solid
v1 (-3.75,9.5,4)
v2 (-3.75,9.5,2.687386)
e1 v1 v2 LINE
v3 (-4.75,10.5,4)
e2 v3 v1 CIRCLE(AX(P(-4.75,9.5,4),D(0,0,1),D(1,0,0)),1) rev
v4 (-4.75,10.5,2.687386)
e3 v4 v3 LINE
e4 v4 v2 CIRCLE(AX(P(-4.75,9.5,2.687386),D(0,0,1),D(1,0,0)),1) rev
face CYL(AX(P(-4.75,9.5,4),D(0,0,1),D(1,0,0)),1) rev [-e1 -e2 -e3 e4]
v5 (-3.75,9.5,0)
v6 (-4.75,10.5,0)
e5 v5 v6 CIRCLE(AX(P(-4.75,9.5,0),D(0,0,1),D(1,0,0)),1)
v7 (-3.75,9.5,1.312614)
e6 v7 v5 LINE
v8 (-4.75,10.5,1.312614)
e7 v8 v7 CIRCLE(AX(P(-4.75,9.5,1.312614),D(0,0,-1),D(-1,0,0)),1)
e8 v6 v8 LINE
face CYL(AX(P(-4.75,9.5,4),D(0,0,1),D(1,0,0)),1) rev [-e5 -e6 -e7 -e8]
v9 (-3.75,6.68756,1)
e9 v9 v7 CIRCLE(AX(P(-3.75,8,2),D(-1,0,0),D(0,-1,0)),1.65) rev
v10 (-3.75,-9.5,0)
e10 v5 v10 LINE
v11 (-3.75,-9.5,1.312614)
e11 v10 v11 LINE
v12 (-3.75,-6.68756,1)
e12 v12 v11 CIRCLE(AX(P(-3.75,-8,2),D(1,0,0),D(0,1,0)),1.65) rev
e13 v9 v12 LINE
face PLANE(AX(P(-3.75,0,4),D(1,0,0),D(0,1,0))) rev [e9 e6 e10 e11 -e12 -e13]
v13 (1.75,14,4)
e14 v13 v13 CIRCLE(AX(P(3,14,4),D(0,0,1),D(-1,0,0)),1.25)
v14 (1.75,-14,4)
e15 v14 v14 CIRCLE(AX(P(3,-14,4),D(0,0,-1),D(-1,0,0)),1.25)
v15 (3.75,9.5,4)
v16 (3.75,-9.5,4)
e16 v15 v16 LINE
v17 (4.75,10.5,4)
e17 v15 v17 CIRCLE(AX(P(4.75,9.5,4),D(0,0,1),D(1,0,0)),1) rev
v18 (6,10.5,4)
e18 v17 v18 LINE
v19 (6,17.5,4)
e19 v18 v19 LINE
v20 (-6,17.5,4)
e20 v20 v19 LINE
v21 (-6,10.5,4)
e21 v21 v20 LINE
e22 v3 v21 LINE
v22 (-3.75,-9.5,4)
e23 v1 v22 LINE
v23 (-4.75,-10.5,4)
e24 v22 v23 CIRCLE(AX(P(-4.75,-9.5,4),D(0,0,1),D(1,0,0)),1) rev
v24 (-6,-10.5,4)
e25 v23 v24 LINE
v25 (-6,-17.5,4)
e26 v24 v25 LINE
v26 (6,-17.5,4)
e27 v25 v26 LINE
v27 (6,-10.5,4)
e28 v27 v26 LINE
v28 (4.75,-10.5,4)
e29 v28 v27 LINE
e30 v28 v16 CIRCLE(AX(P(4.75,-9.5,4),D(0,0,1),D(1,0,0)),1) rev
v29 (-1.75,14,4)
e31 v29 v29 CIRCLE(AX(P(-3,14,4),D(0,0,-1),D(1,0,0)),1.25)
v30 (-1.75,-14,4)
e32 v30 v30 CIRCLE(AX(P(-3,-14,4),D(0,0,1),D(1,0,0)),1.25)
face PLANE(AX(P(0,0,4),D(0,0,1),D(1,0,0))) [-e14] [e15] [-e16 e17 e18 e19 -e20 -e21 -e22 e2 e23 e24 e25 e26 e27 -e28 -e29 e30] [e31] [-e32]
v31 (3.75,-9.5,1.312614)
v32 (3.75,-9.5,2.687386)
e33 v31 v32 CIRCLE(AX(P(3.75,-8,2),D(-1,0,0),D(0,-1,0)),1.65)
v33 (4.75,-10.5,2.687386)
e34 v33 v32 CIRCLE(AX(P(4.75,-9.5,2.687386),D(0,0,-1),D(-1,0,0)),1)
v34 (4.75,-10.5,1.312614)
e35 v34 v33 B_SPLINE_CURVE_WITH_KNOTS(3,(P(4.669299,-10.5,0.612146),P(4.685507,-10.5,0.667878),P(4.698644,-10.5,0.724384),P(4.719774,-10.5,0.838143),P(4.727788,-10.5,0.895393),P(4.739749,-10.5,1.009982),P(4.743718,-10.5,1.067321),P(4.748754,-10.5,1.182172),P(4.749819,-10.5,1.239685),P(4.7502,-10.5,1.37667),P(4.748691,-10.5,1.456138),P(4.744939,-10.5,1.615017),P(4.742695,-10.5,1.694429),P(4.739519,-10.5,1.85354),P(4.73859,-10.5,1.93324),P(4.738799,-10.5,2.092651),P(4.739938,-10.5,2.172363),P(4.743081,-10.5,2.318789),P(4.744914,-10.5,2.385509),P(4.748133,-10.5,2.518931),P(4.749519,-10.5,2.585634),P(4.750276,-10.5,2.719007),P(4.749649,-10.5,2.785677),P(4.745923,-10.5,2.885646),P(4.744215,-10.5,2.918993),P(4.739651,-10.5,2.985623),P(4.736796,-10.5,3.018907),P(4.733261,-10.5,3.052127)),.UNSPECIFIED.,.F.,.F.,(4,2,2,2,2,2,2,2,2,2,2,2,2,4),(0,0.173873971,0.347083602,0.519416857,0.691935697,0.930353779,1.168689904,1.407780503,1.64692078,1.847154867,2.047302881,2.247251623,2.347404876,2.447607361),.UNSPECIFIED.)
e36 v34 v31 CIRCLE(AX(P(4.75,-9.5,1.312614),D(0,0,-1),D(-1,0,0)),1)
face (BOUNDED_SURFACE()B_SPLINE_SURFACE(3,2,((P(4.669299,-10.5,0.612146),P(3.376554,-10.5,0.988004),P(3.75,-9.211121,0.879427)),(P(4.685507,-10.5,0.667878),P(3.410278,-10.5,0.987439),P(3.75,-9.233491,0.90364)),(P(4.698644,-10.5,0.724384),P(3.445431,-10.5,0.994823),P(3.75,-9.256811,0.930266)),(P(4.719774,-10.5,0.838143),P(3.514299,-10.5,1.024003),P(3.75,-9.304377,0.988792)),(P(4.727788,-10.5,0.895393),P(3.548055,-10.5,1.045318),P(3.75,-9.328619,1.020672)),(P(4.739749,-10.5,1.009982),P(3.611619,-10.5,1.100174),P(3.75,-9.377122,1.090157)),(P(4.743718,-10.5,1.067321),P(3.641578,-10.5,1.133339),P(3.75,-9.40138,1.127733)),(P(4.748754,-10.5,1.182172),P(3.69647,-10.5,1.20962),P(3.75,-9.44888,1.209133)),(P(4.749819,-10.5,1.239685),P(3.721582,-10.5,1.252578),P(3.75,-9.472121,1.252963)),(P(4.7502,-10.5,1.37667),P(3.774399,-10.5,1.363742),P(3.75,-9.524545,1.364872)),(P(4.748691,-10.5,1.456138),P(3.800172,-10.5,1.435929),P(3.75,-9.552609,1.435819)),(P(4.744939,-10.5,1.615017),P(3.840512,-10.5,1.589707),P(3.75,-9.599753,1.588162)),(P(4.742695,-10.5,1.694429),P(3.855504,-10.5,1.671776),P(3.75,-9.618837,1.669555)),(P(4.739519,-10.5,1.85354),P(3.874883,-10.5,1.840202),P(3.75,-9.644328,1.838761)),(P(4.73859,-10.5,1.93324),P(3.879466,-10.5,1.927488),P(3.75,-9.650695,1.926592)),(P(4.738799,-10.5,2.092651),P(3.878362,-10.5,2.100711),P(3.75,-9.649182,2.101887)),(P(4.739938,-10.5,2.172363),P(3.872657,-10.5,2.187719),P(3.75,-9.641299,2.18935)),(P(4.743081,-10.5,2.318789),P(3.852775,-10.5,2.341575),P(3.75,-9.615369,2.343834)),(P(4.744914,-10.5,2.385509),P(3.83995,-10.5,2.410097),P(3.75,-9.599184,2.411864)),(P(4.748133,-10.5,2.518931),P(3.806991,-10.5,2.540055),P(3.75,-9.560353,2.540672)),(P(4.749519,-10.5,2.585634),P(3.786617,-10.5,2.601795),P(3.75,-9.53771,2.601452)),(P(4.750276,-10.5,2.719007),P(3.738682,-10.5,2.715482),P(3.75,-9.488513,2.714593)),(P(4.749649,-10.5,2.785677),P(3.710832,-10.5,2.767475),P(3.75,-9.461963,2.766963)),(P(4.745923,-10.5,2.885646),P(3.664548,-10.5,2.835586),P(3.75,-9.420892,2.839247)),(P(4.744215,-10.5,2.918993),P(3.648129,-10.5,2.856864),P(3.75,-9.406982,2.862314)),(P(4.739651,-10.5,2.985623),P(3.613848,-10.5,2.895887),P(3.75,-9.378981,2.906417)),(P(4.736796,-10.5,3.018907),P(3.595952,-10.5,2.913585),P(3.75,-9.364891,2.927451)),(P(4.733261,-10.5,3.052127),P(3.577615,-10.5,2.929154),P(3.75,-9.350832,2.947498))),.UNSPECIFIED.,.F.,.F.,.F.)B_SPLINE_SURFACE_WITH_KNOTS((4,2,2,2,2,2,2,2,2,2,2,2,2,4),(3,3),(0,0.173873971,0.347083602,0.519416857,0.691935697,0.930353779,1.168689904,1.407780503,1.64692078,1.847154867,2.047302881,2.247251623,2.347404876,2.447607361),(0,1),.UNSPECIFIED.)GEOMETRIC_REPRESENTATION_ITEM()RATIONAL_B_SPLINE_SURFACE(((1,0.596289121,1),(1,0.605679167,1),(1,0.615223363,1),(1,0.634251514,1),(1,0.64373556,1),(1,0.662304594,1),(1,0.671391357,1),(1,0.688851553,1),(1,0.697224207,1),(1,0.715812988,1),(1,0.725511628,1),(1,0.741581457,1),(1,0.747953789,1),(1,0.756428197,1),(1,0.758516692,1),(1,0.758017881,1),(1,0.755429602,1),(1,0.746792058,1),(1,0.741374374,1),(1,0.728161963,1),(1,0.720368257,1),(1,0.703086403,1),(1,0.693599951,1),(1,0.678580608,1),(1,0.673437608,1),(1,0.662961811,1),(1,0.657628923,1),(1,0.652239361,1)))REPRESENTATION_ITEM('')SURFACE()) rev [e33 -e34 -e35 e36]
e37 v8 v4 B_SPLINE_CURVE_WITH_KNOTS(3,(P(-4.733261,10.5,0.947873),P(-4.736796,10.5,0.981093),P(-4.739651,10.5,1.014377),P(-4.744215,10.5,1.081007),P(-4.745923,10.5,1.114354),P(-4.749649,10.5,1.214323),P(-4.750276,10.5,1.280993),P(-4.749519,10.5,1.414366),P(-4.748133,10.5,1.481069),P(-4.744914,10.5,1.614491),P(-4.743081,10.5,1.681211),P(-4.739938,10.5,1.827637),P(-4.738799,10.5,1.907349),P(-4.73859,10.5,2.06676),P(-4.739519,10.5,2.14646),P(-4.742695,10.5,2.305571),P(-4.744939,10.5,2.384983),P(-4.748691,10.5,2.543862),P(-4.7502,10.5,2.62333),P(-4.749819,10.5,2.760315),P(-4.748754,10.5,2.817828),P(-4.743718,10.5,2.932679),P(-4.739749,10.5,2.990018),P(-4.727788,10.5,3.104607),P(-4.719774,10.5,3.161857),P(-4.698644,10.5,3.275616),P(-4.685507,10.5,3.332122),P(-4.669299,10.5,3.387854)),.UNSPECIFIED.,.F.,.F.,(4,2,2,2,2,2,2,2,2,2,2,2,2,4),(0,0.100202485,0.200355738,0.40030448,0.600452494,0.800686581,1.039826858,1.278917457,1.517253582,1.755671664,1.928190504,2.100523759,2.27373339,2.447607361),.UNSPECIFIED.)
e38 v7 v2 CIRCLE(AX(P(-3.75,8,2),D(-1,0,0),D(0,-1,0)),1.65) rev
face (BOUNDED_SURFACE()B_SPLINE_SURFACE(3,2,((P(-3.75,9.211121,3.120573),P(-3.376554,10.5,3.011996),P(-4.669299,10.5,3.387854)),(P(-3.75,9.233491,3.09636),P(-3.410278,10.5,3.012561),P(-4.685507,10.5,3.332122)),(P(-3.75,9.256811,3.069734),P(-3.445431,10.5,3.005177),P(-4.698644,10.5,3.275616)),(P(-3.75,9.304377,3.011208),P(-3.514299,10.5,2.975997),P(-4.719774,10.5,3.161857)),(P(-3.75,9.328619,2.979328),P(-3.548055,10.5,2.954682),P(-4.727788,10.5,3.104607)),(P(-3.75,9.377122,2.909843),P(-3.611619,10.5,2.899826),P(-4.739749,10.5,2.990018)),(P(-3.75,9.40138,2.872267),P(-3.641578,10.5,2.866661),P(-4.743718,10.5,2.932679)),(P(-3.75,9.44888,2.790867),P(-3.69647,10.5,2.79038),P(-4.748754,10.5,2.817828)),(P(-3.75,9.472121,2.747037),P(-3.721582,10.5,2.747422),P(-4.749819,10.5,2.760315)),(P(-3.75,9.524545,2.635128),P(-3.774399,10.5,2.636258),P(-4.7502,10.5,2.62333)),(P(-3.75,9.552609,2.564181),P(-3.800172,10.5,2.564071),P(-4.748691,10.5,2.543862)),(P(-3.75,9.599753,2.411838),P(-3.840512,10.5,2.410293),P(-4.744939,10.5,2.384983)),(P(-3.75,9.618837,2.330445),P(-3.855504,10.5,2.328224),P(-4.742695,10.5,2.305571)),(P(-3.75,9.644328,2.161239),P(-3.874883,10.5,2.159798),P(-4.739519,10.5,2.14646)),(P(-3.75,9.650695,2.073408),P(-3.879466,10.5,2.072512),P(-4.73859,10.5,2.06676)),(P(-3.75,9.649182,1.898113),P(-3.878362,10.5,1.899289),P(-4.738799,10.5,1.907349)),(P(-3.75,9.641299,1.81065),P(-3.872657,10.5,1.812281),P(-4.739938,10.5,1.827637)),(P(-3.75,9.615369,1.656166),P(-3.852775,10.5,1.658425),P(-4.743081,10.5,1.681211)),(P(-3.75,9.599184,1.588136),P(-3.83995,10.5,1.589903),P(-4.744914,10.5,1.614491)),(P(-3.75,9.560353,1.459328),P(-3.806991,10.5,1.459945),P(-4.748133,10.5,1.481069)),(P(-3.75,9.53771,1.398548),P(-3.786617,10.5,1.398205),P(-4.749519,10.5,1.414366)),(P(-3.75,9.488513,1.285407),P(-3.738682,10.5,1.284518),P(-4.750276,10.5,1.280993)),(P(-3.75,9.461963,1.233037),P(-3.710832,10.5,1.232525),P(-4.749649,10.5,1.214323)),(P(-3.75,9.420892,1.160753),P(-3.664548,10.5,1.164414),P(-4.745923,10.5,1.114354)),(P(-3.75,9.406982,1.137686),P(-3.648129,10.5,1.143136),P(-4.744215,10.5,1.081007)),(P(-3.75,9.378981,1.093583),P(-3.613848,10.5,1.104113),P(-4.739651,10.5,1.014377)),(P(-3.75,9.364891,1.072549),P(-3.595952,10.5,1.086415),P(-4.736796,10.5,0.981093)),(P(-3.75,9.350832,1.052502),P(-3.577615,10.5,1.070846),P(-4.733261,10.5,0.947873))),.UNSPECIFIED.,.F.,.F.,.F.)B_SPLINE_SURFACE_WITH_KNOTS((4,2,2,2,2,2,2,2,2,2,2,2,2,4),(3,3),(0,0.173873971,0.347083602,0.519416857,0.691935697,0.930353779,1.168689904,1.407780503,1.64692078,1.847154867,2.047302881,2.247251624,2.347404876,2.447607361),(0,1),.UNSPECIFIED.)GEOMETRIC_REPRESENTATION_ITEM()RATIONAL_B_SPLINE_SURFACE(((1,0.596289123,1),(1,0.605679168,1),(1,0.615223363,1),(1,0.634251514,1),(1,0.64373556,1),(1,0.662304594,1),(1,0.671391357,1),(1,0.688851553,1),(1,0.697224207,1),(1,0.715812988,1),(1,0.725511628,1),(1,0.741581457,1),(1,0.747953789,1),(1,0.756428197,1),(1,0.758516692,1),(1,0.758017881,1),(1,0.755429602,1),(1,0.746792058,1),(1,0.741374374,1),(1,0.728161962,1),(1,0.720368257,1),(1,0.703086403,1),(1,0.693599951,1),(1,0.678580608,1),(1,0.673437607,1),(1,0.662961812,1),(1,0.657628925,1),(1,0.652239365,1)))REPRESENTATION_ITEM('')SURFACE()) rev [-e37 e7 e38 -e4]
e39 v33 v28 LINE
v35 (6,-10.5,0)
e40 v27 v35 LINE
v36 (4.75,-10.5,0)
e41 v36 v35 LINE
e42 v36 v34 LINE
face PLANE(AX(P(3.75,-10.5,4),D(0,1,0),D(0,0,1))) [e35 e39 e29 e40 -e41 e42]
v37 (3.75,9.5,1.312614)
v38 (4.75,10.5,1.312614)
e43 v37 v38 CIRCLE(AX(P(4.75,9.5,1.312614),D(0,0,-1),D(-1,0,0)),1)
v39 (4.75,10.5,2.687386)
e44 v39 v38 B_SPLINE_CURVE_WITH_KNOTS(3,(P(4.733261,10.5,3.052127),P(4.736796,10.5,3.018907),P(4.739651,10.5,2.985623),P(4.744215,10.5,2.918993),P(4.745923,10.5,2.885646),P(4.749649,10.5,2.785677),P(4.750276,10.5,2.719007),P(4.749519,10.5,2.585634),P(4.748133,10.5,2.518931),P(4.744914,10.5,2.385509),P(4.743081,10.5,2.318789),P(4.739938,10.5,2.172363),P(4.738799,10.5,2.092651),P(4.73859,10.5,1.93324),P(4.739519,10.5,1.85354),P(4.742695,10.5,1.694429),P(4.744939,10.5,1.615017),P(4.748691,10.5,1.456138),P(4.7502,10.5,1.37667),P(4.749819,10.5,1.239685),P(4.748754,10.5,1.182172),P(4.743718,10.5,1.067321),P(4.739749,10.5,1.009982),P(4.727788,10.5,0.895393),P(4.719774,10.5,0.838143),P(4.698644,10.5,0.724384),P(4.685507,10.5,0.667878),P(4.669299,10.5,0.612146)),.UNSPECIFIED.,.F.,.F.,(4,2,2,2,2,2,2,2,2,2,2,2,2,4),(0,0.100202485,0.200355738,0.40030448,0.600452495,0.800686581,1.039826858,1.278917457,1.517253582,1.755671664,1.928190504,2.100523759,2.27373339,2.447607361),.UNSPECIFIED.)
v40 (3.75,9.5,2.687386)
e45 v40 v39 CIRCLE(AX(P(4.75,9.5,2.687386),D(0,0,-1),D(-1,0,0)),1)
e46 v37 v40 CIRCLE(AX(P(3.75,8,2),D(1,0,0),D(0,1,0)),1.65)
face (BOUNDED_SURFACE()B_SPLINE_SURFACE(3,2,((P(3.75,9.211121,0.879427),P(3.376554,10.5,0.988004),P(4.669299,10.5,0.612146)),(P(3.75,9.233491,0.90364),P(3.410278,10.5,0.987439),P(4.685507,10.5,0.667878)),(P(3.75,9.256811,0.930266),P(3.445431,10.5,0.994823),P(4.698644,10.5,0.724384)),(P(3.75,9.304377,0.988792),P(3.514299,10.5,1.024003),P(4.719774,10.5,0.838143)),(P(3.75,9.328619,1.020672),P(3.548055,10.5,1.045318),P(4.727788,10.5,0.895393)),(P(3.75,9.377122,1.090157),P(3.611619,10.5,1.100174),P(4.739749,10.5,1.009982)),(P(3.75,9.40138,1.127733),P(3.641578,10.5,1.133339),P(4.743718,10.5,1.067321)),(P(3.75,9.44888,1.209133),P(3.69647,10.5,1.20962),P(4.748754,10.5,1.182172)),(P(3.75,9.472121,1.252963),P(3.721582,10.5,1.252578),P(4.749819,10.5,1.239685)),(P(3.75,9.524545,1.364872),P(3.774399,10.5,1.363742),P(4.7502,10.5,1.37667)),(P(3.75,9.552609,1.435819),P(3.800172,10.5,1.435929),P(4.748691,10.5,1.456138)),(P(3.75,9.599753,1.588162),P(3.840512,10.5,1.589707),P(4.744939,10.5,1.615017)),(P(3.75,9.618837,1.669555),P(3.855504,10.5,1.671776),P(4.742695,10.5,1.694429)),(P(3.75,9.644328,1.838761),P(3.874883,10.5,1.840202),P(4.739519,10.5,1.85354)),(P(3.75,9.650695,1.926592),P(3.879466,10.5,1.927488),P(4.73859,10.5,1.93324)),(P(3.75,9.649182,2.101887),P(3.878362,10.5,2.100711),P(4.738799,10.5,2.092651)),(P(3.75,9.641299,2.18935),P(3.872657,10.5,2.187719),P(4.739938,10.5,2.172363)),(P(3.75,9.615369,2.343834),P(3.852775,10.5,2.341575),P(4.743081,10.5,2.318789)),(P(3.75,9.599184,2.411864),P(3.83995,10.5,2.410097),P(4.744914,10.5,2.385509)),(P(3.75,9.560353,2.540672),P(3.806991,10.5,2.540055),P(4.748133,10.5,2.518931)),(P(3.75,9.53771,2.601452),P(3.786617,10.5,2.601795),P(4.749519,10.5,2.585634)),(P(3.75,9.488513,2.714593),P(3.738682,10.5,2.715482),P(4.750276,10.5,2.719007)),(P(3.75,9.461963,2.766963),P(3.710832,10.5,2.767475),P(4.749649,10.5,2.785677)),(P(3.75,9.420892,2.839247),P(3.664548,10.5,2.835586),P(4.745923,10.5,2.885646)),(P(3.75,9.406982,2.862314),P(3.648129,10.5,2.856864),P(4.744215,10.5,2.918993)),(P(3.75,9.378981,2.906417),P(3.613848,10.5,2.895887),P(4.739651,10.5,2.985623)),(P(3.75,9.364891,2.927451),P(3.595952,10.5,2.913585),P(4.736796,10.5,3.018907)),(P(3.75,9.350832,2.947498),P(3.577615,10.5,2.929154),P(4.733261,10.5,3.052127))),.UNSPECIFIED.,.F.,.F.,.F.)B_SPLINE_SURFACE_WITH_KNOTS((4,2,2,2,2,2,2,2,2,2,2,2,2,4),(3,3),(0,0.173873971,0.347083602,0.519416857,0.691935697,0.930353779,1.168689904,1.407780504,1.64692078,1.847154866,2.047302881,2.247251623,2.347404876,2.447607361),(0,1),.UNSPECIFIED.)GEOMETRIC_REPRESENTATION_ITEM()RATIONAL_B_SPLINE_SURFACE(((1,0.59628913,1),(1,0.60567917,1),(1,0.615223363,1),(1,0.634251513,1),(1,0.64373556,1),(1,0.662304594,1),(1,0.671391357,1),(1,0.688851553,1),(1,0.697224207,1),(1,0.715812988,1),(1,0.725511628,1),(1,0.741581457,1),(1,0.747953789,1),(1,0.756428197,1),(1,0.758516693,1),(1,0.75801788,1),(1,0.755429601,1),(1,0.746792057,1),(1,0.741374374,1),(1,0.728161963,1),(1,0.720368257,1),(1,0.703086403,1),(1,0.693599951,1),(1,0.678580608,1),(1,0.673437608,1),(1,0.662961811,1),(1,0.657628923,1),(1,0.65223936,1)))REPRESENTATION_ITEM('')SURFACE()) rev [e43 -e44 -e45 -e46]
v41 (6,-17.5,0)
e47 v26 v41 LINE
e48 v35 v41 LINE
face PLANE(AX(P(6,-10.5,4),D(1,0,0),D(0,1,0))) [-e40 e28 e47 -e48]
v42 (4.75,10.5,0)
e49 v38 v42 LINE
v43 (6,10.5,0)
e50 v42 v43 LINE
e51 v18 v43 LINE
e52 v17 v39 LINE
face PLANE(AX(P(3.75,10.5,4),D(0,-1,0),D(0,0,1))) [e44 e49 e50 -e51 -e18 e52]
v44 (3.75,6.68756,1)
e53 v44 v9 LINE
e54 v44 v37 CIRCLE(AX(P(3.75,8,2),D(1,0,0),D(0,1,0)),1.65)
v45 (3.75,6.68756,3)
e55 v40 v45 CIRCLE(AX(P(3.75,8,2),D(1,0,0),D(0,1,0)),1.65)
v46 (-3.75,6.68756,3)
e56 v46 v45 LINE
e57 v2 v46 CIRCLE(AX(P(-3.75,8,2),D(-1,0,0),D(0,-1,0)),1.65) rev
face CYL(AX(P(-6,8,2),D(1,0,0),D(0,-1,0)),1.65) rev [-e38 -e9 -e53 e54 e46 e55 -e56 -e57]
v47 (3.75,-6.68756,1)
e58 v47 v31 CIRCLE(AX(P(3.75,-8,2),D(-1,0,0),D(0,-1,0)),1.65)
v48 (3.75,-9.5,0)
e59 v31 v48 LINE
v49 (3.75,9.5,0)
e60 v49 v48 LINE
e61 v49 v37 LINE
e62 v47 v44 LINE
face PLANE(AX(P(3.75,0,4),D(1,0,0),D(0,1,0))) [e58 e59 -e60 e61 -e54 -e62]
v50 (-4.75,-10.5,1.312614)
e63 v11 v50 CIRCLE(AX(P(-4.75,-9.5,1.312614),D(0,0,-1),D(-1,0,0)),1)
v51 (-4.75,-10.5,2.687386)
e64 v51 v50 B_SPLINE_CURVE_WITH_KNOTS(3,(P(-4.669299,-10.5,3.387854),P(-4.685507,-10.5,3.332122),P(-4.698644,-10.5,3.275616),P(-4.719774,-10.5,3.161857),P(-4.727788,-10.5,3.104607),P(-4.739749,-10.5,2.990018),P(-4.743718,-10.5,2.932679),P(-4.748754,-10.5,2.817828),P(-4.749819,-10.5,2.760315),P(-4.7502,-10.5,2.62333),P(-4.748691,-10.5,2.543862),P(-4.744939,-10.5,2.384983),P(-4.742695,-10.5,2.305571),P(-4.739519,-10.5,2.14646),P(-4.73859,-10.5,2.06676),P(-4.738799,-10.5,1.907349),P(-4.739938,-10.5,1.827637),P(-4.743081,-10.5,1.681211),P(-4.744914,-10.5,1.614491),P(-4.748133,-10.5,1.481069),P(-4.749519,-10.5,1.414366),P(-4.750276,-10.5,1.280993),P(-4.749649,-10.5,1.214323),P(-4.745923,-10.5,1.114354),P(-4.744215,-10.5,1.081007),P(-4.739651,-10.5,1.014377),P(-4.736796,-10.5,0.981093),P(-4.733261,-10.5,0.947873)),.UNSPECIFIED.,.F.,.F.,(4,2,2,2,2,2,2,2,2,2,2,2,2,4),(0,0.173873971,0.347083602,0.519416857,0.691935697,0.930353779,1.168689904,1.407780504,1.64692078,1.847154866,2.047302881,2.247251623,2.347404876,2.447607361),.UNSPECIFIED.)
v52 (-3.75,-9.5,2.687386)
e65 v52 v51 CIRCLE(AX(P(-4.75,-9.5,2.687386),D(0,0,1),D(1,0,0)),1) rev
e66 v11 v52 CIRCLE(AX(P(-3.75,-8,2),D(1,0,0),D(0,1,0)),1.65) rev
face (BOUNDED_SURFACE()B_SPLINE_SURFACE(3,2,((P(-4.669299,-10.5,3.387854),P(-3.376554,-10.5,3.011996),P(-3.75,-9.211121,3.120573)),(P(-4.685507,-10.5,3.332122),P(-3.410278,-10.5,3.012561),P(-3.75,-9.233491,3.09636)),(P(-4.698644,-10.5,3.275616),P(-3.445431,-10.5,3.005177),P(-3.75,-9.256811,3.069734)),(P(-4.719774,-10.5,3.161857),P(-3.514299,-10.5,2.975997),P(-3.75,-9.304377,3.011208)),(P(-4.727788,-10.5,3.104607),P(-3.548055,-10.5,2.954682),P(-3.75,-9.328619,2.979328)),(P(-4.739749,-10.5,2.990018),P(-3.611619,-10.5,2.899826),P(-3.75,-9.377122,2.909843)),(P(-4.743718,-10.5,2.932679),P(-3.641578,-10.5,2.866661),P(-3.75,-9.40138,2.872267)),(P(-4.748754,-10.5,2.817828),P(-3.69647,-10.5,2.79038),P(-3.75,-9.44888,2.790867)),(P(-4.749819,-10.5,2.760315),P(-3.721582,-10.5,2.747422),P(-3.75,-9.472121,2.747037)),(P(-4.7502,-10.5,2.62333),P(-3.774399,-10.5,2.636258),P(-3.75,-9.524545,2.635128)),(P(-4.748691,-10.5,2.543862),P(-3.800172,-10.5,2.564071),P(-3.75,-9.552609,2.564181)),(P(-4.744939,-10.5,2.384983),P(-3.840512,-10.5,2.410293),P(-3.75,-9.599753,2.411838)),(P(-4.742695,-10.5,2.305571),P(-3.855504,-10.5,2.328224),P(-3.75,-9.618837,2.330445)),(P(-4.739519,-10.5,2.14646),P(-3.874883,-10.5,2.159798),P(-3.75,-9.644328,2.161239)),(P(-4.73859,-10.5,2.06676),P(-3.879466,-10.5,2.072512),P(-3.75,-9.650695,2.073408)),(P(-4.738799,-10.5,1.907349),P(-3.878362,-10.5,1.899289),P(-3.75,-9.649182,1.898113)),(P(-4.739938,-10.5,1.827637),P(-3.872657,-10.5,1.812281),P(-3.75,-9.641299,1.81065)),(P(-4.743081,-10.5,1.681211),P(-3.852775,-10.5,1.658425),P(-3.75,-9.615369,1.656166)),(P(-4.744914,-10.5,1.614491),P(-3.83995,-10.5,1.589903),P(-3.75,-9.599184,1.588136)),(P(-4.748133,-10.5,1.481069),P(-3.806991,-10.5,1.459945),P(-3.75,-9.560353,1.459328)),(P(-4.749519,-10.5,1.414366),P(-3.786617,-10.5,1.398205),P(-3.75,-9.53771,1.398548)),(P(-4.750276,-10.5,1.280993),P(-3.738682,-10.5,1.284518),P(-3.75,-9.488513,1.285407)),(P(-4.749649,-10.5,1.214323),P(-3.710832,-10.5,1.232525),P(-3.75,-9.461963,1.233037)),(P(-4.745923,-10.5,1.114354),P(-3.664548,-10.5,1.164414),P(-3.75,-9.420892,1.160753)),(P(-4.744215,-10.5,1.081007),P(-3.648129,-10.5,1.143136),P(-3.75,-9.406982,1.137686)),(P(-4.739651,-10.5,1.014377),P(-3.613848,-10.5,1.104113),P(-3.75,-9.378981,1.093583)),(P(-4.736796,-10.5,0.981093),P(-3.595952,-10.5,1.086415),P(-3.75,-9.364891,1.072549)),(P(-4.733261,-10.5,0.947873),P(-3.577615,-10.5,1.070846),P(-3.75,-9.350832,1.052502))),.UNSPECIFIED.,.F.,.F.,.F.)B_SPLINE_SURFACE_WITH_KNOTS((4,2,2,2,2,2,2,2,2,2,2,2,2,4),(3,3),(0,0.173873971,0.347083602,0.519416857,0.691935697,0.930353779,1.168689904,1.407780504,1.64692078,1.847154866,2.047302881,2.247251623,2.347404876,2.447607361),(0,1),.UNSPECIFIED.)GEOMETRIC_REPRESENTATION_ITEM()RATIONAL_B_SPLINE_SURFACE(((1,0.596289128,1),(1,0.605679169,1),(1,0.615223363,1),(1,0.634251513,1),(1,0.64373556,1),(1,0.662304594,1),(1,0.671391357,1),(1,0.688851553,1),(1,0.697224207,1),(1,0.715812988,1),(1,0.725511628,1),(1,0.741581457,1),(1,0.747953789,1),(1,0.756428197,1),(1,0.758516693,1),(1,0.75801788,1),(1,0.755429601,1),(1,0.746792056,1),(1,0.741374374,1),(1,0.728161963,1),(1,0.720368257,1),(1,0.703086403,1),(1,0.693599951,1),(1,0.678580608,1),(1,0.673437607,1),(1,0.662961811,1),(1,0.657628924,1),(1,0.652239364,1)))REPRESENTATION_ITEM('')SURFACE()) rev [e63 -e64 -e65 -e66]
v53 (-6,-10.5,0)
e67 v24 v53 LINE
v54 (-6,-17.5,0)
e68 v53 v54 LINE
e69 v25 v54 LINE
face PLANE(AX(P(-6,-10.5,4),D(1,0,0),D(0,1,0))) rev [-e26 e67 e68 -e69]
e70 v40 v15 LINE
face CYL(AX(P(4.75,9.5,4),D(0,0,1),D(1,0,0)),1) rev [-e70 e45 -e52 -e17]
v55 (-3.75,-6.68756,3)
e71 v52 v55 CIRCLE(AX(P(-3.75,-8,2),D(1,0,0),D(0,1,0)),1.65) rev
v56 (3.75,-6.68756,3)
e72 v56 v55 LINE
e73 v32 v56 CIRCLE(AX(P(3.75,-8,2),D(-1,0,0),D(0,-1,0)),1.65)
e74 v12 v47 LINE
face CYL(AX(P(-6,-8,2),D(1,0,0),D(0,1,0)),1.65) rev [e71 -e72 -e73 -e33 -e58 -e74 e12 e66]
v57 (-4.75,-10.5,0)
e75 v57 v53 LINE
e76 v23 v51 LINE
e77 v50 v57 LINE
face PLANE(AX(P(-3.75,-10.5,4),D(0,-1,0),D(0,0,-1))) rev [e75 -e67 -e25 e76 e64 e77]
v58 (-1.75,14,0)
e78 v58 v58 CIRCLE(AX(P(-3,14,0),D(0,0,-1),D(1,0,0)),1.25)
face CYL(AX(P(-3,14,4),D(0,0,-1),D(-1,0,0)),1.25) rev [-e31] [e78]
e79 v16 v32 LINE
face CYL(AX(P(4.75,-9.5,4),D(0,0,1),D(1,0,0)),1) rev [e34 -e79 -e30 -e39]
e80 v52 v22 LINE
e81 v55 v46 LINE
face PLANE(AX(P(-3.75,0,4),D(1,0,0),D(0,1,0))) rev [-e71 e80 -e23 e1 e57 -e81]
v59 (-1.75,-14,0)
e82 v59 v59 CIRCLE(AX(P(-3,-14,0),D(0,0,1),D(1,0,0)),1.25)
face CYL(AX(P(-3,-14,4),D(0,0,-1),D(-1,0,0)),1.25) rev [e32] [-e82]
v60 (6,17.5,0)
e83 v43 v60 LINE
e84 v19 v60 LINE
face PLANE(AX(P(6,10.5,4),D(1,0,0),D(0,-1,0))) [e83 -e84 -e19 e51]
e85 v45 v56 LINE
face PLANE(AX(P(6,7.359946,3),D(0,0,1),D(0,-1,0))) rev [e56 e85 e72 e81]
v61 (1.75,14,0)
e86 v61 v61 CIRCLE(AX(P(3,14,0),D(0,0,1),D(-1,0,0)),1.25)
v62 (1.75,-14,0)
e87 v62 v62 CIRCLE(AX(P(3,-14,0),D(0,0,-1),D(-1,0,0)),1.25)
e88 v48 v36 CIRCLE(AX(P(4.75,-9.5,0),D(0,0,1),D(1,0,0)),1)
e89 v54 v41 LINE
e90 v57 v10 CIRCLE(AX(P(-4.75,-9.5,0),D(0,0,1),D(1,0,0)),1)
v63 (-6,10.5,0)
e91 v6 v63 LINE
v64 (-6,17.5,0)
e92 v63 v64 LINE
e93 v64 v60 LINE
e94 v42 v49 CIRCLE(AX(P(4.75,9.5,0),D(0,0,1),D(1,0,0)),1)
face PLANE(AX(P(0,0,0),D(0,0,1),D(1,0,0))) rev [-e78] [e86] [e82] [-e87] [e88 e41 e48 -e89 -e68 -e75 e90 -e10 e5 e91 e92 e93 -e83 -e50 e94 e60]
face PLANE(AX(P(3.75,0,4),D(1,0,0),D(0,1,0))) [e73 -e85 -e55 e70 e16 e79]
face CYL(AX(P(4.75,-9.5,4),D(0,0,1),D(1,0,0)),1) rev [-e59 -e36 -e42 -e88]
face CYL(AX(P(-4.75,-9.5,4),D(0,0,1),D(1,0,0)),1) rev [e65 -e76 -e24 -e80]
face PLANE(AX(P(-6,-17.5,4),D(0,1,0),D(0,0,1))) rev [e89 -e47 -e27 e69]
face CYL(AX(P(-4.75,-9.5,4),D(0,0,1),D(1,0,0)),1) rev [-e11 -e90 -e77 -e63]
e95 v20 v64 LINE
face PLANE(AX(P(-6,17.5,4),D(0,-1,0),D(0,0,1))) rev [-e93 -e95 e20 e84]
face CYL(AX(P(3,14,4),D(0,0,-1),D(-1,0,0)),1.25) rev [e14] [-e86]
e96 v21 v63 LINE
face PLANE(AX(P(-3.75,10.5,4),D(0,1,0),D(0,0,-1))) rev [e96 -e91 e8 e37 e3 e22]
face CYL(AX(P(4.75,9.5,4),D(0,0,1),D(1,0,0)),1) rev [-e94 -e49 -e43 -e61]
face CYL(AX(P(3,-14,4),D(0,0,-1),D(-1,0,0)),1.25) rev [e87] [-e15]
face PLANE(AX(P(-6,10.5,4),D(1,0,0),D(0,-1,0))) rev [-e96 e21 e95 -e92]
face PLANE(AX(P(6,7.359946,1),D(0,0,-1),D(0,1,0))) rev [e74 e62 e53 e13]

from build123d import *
from build123d.topology import SkipClean

# Parameters (mm, degrees)
SKETCH1_R                = 1.25
BOSS_EXTRUDE1_DEPTH      = 4
SKETCH2_R                = 1.65
BOSS_EXTRUDE2_DEPTH      = 3.75
SKETCH2_2_R              = 1.65
CUT_EXTRUDE1_DEPTH       = 19.338824935
MIRROR19_COPY_1_SKETCH_R = 1.25
MIRROR19_COPY_1_DEPTH    = 4
MIRROR19_COPY_2_SKETCH_R = 1.65
MIRROR19_COPY_2_DEPTH    = 3.75
MIRROR19_COPY_3_SKETCH_R = 1.65
MIRROR19_COPY_3_DEPTH    = 19.338824935
MIRROR19_COPY_4_SKETCH_R = 1.65
MIRROR19_COPY_4_DEPTH    = 3.75
MIRROR19_COPY_5_SKETCH_R = 1.65
MIRROR19_COPY_5_DEPTH    = 19.338824935
SKETCH4_W                = 2
SKETCH4_H                = 15.373217597
CUT_EXTRUDE3_DEPTH       = 21.428228019
FILLET1_R                = 1


with BuildPart() as part:
    # Sketch1 → Boss-Extrude1 (new body)
    with BuildSketch(Plane.XY):
        Polygon((0, 0), (-3.75, 0), (-3.75, -10.5), (-6, -10.5), (-6, -17.5), (0, -17.5), align=None)
        with Locations((-3, -14)):
            Circle(SKETCH1_R, mode=Mode.SUBTRACT)
    boss_extrude1 = extrude(amount=BOSS_EXTRUDE1_DEPTH)

    # Sketch2 → Boss-Extrude2 (add, through all)
    with BuildSketch(Plane.ZY.offset(3.75)):
        with Locations((2, -8)):
            Circle(SKETCH2_R)
    boss_extrude2 = extrude(amount=-BOSS_EXTRUDE2_DEPTH)

    # Sketch2<2> → Cut-Extrude1 (cut, through all)
    with BuildSketch(Plane.ZY.offset(3.75)):
        with Locations(Location((2, -8, 0), (0, 0, 270))):
            Circle(SKETCH2_2_R)
    cut_extrude1 = extrude(amount=-CUT_EXTRUDE1_DEPTH, mode=Mode.SUBTRACT)

    # Mirror6: Boss-Extrude1, Boss-Extrude2, Cut-Extrude1 across plane
    add(boss_extrude1.mirror(Plane(origin=(0, -17.5, 4), x_dir=(0, 0, 1), z_dir=(-1, 0, 0))))
    add(boss_extrude2.mirror(Plane(origin=(0, -17.5, 4), x_dir=(0, 0, 1), z_dir=(-1, 0, 0))))
    add(cut_extrude1.mirror(Plane(origin=(0, -17.5, 4), x_dir=(0, 0, 1), z_dir=(-1, 0, 0))), mode=Mode.SUBTRACT)

    # Mirror19: Boss-Extrude1 across plane
    add(boss_extrude1.mirror(Plane.ZX))

    # Mirror19 copy 1 sketch → Mirror19 copy 1 (add)
    with BuildSketch(Plane(origin=(0, 0, 0), x_dir=(-1, 0, 0), z_dir=(0, 0, 1))):
        Polygon((0, 0), (-3.75, 0), (-3.75, -10.5), (-6, -10.5), (-6, -17.5), (0, -17.5), align=None)
        with Locations((-3, -14)):
            Circle(MIRROR19_COPY_1_SKETCH_R, mode=Mode.SUBTRACT)
    extrude(amount=MIRROR19_COPY_1_DEPTH)

    # Mirror19 copy 2 sketch → Mirror19 copy 2 (add, through all)
    with BuildSketch(Plane(origin=(3.75, 0, 0), x_dir=(0, 0, 1), z_dir=(1, 0, 0))):
        with Locations((2, -8)):
            Circle(MIRROR19_COPY_2_SKETCH_R)
    extrude(amount=-MIRROR19_COPY_2_DEPTH)

    # Mirror19 copy 3 sketch → Mirror19 copy 3 (cut, through all)
    with BuildSketch(Plane(origin=(3.75, 0, 0), x_dir=(0, 0, 1), z_dir=(1, 0, 0))):
        with Locations(Location((2, -8, 0), (0, 0, 270))):
            Circle(MIRROR19_COPY_3_SKETCH_R)
    extrude(amount=-MIRROR19_COPY_3_DEPTH, mode=Mode.SUBTRACT)

    # Mirror19 copy 4 sketch → Mirror19 copy 4 (add, through all)
    with BuildSketch(Plane.ZY.offset(3.75)):
        with Locations((2, 8)):
            Circle(MIRROR19_COPY_4_SKETCH_R)
    extrude(amount=-MIRROR19_COPY_4_DEPTH)

    # Mirror19 copy 5 sketch → Mirror19 copy 5 (cut, through all)
    with BuildSketch(Plane.ZY.offset(3.75)):
        with Locations((2, 8)):
            Circle(MIRROR19_COPY_5_SKETCH_R)
    extrude(amount=-MIRROR19_COPY_5_DEPTH, mode=Mode.SUBTRACT)

    # Sketch4 → Cut-Extrude3 (cut, through all)
    with SkipClean():  # the faces are left unmerged after this step: merging them gives an invalid solid
        with BuildSketch(Plane.ZY.offset(3.75)):
            with Locations((2, -0.3266625)):
                Rectangle(SKETCH4_W, SKETCH4_H)
        extrude(amount=-CUT_EXTRUDE3_DEPTH, mode=Mode.SUBTRACT)
    add(part.part.scale(1), mode=Mode.REPLACE)  # the faces are merged on a copy

    # Fillet1
    fillet1_edges = [part.edges().sort_by_distance(p)[0] for p in [
        (-3.75, -10.5, 2),
        (3.75, -10.5, 2),
        (-3.75, 10.5, 2),
        (3.75, 10.5, 2),
    ]]
    fillet(fillet1_edges, radius=FILLET1_R)


solid = part.part
